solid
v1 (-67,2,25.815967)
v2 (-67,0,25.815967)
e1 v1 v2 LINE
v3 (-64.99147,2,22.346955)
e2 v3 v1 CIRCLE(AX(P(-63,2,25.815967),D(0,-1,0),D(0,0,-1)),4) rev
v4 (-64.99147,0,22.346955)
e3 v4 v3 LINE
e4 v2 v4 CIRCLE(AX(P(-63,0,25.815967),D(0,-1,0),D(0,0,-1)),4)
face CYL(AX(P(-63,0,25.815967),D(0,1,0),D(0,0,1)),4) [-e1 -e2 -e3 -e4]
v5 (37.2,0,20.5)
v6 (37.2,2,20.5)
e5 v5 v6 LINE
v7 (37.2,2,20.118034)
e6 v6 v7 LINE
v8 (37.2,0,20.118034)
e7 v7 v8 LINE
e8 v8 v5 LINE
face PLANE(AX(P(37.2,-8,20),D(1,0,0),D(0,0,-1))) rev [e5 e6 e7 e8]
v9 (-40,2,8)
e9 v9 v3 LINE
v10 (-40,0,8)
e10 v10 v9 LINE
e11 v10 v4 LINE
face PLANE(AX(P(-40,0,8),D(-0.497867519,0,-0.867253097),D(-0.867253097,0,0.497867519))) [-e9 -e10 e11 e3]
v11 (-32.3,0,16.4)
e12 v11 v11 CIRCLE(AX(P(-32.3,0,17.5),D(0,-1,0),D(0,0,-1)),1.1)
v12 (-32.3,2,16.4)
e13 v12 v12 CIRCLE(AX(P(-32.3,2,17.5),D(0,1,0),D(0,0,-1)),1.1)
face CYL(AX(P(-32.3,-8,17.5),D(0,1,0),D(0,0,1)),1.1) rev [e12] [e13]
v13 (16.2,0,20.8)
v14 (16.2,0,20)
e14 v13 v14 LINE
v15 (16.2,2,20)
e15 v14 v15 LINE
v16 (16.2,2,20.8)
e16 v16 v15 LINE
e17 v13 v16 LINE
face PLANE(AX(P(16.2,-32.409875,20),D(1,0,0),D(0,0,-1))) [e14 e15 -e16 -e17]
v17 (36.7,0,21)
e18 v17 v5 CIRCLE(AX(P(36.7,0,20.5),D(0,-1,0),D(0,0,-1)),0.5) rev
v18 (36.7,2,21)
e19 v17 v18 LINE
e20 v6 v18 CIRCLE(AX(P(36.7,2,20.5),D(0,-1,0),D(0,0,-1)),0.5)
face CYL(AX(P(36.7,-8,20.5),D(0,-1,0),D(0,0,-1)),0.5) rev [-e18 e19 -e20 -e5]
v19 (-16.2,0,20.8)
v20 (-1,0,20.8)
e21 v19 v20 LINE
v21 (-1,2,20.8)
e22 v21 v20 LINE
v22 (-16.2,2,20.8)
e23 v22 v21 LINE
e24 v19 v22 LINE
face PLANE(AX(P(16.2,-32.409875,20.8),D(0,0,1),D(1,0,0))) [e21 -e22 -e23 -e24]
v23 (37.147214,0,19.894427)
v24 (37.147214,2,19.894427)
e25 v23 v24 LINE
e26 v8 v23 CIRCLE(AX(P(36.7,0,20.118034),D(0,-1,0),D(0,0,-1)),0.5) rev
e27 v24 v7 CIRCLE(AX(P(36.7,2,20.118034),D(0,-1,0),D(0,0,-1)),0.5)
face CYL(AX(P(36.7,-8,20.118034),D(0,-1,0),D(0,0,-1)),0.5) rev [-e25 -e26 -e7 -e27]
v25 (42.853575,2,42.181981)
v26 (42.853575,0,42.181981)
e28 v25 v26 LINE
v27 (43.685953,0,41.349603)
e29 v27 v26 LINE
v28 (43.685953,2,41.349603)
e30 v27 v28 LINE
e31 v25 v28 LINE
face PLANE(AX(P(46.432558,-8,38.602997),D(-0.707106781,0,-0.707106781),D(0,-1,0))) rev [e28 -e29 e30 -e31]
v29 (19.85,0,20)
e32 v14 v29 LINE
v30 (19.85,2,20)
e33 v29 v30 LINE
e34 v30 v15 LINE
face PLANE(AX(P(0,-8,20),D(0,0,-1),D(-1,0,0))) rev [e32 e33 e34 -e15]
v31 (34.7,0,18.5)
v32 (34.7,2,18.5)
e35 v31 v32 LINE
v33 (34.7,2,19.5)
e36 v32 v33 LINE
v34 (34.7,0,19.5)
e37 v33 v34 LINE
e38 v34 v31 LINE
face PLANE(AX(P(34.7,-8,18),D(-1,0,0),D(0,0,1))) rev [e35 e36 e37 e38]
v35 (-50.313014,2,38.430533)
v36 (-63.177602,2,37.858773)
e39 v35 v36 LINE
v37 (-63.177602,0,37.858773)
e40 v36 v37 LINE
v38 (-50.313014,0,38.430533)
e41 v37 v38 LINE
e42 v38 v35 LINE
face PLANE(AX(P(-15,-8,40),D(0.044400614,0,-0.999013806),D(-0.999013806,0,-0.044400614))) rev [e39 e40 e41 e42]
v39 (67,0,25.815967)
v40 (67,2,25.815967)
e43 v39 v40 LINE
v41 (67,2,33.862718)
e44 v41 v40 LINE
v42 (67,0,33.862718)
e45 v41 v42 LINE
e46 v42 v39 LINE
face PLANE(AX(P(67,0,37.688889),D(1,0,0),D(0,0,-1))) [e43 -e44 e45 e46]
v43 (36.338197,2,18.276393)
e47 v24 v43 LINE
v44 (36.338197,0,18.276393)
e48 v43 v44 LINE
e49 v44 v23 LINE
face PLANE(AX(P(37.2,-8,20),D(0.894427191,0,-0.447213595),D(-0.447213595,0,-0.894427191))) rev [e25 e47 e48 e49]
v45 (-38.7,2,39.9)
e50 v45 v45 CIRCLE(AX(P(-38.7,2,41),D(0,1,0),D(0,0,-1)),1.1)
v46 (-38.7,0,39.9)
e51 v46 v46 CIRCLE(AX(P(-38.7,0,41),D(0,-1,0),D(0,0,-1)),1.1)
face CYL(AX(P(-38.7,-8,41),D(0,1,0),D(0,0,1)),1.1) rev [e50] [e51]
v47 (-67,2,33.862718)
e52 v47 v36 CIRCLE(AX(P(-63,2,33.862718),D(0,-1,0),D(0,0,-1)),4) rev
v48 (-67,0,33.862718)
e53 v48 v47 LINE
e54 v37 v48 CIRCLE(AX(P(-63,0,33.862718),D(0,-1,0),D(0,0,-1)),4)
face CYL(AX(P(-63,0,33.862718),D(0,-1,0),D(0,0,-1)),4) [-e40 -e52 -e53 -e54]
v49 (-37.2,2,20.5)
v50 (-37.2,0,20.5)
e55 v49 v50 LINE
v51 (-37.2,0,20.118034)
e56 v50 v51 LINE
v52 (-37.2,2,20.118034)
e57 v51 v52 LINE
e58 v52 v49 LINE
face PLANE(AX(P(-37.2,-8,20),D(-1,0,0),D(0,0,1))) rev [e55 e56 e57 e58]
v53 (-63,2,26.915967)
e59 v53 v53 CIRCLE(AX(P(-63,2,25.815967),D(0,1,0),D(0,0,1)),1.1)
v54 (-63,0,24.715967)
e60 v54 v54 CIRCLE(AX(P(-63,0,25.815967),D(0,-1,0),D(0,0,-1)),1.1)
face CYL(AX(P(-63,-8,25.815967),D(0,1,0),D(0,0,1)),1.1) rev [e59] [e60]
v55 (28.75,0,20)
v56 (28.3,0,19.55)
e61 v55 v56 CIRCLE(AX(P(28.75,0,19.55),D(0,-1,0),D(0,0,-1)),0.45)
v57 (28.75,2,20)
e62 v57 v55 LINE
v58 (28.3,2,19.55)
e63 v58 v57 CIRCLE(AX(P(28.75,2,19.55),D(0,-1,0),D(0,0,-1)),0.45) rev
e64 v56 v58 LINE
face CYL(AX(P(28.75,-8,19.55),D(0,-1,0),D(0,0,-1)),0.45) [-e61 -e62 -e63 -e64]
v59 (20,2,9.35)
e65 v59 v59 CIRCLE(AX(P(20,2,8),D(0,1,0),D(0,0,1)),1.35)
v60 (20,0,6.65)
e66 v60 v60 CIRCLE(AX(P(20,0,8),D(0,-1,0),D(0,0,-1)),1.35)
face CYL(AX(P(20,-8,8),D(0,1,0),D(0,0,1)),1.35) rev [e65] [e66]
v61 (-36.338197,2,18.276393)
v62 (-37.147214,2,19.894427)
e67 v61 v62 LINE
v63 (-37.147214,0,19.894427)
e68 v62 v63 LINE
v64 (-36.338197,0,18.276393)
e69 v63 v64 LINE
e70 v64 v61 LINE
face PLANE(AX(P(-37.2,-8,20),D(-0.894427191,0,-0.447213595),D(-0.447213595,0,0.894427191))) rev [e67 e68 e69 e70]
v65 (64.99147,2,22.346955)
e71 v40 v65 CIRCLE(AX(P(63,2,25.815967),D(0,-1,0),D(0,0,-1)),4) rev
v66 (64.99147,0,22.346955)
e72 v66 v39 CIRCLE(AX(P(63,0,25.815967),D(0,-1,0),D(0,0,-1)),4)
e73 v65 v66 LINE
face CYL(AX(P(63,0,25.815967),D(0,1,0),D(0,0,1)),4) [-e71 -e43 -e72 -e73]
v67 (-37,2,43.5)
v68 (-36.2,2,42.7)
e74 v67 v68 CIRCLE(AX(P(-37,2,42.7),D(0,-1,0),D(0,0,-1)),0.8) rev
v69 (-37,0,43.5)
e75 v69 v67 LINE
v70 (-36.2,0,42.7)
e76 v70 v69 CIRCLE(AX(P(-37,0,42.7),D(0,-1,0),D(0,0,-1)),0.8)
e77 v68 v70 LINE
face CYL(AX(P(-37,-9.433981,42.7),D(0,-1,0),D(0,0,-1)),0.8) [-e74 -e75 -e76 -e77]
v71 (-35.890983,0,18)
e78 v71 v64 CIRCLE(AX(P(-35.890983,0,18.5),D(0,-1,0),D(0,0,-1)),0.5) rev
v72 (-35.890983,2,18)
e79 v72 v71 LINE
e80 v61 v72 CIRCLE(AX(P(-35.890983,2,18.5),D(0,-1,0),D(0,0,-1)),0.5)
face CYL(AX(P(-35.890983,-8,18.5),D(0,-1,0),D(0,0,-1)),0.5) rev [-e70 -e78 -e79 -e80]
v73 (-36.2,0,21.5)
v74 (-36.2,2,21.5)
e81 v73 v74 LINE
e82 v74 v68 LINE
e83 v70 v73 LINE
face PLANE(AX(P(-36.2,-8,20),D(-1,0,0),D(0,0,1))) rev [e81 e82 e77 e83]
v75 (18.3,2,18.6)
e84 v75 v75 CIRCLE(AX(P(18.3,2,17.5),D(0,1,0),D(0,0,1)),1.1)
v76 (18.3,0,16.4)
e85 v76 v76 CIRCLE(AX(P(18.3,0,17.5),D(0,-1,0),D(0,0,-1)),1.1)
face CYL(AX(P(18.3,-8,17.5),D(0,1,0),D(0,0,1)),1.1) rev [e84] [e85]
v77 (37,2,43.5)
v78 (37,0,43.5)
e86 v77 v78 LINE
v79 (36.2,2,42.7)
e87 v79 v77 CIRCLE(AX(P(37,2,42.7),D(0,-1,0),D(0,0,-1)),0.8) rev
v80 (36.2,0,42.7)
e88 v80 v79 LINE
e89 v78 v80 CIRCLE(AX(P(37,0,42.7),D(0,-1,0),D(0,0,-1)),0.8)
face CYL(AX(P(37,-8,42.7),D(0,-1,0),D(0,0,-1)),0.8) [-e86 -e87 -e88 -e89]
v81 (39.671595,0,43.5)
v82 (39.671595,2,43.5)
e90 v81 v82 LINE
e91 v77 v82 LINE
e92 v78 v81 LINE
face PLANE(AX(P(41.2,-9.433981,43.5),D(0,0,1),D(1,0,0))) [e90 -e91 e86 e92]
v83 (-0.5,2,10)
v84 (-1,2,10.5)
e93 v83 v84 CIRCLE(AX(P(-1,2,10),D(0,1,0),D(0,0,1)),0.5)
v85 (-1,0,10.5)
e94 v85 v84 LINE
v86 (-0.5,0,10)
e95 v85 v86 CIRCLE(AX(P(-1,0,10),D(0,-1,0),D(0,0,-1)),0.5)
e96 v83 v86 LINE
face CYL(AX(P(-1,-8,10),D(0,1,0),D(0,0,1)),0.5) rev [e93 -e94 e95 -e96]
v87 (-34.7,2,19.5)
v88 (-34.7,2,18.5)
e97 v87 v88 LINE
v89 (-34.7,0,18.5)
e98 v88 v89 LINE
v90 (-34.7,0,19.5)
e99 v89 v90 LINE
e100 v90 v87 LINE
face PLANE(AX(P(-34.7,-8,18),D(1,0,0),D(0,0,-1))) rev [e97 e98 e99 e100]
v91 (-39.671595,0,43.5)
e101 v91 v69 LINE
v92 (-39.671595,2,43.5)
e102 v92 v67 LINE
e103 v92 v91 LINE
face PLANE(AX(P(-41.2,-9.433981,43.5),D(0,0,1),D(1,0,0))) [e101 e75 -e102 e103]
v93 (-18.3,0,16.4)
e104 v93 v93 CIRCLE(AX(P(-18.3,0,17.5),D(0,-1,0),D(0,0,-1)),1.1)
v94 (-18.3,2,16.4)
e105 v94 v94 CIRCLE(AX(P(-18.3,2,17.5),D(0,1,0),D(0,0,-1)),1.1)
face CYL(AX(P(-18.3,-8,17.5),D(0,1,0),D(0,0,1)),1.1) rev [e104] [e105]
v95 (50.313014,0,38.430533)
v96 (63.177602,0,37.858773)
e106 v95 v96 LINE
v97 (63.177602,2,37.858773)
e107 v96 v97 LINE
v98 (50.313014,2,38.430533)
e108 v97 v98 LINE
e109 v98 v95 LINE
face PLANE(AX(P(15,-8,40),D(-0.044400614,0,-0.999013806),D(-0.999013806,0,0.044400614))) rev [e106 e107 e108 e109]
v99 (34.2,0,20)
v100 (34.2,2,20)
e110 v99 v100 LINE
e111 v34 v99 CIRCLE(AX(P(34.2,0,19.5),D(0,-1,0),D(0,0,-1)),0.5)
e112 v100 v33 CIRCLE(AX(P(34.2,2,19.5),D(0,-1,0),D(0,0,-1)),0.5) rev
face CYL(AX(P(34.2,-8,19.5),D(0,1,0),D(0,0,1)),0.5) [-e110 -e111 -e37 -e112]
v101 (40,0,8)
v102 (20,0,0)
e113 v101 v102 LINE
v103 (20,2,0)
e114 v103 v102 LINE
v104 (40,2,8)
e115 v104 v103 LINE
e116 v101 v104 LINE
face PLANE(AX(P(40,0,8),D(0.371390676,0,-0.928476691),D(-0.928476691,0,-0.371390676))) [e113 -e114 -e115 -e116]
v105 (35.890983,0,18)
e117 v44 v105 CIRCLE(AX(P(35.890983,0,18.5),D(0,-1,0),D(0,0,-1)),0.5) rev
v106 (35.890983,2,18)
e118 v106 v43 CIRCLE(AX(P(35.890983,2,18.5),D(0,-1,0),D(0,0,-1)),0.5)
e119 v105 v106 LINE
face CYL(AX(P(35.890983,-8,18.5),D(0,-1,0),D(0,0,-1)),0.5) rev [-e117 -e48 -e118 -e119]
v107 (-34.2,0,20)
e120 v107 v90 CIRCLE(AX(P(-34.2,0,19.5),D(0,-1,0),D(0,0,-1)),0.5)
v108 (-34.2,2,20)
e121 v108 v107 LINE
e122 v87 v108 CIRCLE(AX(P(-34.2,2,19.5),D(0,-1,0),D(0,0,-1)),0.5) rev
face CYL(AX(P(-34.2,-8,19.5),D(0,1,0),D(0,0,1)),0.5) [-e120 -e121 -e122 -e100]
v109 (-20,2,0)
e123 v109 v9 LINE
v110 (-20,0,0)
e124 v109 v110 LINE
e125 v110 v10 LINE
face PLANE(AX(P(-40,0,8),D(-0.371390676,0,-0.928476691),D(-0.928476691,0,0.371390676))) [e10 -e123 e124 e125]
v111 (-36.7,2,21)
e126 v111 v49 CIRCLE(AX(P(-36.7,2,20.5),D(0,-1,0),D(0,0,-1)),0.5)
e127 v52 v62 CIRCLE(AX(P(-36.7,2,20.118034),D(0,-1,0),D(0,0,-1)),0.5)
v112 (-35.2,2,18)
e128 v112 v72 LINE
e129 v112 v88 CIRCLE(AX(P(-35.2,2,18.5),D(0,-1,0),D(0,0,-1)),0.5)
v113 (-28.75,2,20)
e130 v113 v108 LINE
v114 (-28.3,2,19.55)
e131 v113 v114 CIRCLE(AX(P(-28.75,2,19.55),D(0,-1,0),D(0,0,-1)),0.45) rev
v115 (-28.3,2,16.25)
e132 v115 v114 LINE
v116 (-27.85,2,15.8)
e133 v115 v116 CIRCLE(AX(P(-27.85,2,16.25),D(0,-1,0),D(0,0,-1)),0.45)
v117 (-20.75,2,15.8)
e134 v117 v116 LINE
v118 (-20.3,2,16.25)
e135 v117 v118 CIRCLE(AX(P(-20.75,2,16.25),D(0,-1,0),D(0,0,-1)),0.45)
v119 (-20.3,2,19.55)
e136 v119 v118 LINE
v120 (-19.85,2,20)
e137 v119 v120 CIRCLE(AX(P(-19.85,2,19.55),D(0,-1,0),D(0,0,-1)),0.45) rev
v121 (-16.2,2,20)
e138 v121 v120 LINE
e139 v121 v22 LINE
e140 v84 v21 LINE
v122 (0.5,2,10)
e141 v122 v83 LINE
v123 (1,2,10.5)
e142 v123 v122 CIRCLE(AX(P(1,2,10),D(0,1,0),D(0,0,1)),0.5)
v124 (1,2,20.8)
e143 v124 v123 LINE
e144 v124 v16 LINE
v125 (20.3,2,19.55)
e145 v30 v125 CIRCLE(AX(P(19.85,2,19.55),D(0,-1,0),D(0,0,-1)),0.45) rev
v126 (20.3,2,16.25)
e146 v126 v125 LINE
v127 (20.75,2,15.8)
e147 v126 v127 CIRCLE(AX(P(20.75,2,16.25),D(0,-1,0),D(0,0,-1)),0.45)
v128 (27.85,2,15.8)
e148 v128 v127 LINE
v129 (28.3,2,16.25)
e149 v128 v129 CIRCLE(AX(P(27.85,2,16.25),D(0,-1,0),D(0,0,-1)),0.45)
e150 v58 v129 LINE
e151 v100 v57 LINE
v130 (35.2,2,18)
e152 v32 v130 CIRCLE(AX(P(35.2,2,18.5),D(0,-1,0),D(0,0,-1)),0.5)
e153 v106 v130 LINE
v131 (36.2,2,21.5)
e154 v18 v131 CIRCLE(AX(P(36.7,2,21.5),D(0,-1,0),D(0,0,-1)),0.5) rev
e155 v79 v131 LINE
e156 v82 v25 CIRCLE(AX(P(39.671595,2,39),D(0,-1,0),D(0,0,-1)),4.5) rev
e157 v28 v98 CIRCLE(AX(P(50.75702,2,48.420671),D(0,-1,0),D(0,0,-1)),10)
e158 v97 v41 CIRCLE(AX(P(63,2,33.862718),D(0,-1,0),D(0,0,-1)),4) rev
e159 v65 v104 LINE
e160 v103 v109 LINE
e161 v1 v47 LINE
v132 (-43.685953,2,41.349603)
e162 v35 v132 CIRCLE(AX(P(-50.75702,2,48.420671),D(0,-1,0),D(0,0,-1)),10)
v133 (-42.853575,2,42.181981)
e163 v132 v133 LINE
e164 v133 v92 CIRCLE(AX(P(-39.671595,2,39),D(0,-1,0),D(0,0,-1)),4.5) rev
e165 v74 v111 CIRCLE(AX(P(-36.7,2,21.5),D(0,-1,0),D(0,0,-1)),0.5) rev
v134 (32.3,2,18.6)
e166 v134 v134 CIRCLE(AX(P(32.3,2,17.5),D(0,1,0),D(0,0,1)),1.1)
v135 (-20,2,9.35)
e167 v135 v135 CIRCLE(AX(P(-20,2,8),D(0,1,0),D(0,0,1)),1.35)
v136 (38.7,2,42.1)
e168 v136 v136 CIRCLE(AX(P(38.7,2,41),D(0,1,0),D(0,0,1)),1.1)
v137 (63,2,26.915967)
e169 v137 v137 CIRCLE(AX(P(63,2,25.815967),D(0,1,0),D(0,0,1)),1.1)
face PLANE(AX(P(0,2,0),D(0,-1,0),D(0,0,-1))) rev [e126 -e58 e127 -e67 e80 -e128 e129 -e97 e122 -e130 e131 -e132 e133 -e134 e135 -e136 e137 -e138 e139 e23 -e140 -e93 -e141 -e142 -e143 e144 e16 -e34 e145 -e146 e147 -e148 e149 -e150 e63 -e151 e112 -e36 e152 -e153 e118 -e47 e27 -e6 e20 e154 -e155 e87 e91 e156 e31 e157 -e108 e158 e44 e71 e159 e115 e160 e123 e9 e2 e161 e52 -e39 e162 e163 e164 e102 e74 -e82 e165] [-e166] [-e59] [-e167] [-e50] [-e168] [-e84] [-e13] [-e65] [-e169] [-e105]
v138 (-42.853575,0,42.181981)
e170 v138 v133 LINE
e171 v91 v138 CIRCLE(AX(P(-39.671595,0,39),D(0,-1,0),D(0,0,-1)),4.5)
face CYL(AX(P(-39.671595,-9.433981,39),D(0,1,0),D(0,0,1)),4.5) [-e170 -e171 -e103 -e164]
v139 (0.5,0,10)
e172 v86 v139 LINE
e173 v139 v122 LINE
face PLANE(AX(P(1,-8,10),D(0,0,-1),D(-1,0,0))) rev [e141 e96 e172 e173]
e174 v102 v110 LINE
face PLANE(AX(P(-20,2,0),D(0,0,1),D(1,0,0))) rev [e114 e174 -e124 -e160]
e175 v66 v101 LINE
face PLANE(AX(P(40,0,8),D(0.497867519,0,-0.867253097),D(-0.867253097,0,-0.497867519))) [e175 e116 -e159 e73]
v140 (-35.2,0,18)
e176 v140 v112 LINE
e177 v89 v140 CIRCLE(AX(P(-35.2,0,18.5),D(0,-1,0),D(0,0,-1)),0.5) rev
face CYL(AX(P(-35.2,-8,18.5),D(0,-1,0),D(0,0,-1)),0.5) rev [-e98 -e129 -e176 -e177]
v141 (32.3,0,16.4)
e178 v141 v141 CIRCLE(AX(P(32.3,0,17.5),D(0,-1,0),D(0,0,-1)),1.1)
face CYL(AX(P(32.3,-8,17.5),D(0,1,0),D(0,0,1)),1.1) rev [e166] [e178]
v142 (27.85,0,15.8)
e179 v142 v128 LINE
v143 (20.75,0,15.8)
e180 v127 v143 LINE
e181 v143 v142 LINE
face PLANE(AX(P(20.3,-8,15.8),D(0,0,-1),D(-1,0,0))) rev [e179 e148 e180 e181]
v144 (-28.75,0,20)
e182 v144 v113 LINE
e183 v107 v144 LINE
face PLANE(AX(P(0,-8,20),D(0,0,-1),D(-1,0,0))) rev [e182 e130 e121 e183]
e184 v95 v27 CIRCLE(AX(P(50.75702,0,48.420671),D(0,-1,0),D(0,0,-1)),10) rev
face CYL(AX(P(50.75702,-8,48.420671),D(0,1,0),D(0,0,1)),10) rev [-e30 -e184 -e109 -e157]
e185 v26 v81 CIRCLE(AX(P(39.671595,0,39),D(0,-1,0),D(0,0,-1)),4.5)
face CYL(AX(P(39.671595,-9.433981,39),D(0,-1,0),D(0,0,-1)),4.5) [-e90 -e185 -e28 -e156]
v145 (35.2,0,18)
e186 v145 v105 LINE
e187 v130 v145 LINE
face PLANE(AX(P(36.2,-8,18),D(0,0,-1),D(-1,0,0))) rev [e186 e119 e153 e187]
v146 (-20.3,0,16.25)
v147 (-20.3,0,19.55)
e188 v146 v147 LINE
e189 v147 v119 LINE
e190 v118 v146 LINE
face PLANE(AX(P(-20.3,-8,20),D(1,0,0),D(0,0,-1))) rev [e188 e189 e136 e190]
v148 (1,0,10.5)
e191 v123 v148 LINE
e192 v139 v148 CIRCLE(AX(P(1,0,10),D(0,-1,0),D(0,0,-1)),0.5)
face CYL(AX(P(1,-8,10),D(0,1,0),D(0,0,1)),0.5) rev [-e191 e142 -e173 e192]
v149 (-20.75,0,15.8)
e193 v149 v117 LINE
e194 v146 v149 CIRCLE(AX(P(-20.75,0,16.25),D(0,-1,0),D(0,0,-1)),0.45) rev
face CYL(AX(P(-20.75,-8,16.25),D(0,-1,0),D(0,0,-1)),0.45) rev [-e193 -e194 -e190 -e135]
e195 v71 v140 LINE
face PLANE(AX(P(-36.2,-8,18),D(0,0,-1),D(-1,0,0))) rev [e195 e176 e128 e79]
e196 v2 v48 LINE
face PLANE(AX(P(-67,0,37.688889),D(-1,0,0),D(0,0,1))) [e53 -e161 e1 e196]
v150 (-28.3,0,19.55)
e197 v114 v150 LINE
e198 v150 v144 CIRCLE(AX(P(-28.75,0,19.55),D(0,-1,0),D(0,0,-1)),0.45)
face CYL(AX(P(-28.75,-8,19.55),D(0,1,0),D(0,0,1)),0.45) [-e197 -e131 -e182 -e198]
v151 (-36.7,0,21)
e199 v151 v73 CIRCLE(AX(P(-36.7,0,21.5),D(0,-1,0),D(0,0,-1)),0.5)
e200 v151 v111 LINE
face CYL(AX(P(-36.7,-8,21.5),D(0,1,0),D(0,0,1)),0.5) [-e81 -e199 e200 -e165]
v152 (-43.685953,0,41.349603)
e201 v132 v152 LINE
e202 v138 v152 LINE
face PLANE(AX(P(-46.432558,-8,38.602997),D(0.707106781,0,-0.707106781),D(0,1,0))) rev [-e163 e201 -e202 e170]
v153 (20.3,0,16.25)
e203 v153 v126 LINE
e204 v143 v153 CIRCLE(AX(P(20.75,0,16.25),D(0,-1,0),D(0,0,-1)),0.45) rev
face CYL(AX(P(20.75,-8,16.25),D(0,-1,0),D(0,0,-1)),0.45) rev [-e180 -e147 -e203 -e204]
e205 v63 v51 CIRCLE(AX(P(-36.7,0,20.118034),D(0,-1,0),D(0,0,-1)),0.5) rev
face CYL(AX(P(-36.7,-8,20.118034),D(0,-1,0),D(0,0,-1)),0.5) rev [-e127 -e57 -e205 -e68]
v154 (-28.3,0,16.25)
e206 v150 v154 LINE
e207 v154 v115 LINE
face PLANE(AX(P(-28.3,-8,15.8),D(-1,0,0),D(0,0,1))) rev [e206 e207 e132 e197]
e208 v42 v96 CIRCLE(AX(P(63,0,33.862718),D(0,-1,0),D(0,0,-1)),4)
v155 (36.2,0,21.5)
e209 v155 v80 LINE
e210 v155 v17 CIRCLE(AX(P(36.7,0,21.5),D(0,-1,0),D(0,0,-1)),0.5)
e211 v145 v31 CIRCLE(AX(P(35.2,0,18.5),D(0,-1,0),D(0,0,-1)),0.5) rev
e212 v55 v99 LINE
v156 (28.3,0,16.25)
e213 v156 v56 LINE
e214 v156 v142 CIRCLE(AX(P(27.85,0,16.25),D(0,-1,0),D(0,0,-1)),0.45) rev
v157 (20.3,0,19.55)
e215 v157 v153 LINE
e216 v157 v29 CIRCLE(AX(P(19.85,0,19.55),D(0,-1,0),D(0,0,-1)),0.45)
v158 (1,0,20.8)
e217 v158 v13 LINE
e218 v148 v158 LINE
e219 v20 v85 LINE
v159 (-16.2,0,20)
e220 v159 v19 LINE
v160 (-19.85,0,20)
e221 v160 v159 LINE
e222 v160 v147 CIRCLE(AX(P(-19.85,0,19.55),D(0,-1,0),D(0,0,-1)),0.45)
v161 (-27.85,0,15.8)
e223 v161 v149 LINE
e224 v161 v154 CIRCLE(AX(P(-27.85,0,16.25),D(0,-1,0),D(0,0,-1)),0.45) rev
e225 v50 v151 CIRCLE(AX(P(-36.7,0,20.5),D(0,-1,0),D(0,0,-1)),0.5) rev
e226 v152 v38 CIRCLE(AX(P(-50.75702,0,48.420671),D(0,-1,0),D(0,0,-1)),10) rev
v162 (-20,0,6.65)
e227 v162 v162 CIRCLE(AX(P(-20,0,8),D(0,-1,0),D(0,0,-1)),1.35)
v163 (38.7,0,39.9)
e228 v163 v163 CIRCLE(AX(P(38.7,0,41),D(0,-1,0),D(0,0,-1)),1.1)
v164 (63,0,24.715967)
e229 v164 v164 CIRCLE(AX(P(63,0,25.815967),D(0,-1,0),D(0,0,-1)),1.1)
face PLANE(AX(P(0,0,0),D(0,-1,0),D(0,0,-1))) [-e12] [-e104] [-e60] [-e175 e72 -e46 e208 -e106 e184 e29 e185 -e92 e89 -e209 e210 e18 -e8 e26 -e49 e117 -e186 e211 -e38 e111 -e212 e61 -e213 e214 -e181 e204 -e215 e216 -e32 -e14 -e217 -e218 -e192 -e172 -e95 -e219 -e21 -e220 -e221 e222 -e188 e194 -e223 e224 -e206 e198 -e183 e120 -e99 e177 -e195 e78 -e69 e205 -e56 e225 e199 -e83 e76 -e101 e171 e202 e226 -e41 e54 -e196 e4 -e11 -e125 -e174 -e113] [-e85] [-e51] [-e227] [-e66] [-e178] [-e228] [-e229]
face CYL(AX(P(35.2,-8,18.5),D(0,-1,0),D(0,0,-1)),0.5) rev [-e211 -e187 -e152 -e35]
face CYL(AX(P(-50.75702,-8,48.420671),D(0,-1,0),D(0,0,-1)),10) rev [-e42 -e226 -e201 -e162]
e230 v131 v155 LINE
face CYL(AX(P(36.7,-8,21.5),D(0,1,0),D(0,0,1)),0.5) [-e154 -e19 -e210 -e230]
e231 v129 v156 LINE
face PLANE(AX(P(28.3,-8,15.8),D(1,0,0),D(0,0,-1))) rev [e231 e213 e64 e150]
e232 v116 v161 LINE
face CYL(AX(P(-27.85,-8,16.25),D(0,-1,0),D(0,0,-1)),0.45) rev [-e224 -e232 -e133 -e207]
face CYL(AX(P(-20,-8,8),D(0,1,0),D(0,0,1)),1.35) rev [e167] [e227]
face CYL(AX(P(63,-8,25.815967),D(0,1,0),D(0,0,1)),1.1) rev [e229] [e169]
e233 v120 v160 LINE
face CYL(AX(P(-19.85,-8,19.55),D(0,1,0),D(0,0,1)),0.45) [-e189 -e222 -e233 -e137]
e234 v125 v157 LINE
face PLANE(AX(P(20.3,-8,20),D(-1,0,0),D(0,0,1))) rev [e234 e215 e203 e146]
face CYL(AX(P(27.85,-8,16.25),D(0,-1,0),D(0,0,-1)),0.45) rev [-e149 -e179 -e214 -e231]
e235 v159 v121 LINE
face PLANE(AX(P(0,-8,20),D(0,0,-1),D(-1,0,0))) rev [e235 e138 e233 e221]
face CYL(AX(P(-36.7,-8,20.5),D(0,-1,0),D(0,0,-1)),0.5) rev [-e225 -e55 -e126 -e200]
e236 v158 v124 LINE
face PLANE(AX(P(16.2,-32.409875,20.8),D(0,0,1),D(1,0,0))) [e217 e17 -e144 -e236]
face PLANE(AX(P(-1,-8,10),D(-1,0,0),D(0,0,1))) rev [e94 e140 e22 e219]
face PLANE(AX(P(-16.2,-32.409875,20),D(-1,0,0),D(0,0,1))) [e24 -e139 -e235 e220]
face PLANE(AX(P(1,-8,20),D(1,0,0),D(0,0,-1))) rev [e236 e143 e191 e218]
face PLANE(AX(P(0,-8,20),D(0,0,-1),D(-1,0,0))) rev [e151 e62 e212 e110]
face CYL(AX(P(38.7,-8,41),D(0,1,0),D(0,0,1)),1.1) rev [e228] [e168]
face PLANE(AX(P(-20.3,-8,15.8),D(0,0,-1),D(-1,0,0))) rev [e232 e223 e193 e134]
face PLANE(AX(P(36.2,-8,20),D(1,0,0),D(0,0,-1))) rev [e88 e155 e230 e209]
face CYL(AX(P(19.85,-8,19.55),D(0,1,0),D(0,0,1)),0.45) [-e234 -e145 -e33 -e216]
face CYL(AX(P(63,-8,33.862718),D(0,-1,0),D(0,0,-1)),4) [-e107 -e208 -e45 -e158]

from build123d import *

# Parameters (mm, degrees)
EXTRUDE_1_DEPTH      = 2
CUT_EXTRUDE_1_DEPTH  = 10
SKETCH_3_W           = 2
SKETCH_3_H           = 10
CUT_EXTRUDE_2_DEPTH  = 10
CUT_EXTRUDE_3_DEPTH  = 10
SKETCH_5_W           = 23
SKETCH_5_H           = 22.484633815
CUT_EXTRUDE_4_DEPTH  = 10
SKETCH_6_W           = 32.4
SKETCH_6_H           = 0.8
EXTRUDE_2_DEPTH      = 2
SKETCH_7_R           = 1.1
CUT_EXTRUDE_5_DEPTH  = 10
EXTRUDE_3_DEPTH      = 2
SKETCH_9_R           = 1.1
CUT_EXTRUDE_6_DEPTH  = 10
CHAMFER_2_SIZE       = 5
CHAMFER_2_SIZE_2     = 5.237723549
FILLET_2_R           = 10
FILLET_3_R           = 4.5
SKETCH_10_W          = 1.5
SKETCH_10_H          = 2
CUT_EXTRUDE_7_DEPTH  = 10
SKETCH_11_R          = 1.35
CUT_EXTRUDE_8_DEPTH  = 10
SKETCH_12_W          = 8
SKETCH_12_H          = 4.2
CUT_EXTRUDE_9_DEPTH  = 10
FILLET_5_R           = 0.45
CUT_EXTRUDE_10_DEPTH = 10
FILLET_6_R           = 0.5
FILLET_7_R           = 0.8
SKETCH_14_R          = 0.5
CUT_EXTRUDE_11_DEPTH = 10
SKETCH_15_W          = 2
SKETCH_15_H          = 0.8
CUT_EXTRUDE_12_DEPTH = 10
EXTRUDE_4_DEPTH      = 2
FILLET_8_R           = 4
SKETCH_17_R          = 1.1
CUT_EXTRUDE_13_DEPTH = 10


# Some blends are built 0.0001 mm under size
with BuildPart() as part:
    # 草图1 → 凸台-拉伸1 (new body)
    with BuildSketch(Plane(origin=(0, 0, 0), x_dir=(1, 0, 0), z_dir=(0, 1, 0))):
        Polygon((-20, 0), (20, 0), (60, -20), (60, -40), (0, -40), (-60, -40), (-60, -20), align=None)
    extrude(amount=EXTRUDE_1_DEPTH)

    # 草图2 → 切除-拉伸1 (cut)
    with BuildSketch(Plane(origin=(0, 2, 0), x_dir=(1, 0, 0), z_dir=(0, 1, 0))):
        Polygon((0, -20), (13.2, -20), (13.2, -40), (-13.2, -40), (-13.2, -20), align=None)
    extrude(amount=-CUT_EXTRUDE_1_DEPTH, mode=Mode.SUBTRACT)

    # 草图3 → 切除-拉伸2 (cut)
    with BuildSketch(Plane(origin=(0, 2, 0), x_dir=(1, 0, 0), z_dir=(0, 1, 0))):
        with Locations((0, -15)):
            Rectangle(SKETCH_3_W, SKETCH_3_H)
    extrude(amount=-CUT_EXTRUDE_2_DEPTH, mode=Mode.SUBTRACT)

    # 草图4 → 切除-拉伸3 (cut)
    with BuildSketch(Plane(origin=(0, 2, 0), x_dir=(1, 0, 0), z_dir=(0, 1, 0))):
        Polygon((-60, -40), (-60, -38), (-15, -40), align=None)
        Polygon((60, -40), (15, -40), (60, -38), align=None)
    extrude(amount=-CUT_EXTRUDE_3_DEPTH, mode=Mode.SUBTRACT)

    # 草图5 → 切除-拉伸4 (cut)
    with BuildSketch(Plane(origin=(0, 2, 0), x_dir=(1, 0, 0), z_dir=(0, 1, 0))):
        with Locations((24.7, -31.242316908)):
            Rectangle(SKETCH_5_W, SKETCH_5_H)
        with Locations((-24.7, -31.242316908)):
            Rectangle(SKETCH_5_W, SKETCH_5_H)
    extrude(amount=-CUT_EXTRUDE_4_DEPTH, mode=Mode.SUBTRACT)

    # 草图6 → 凸台-拉伸2 (add)
    with BuildSketch(Plane(origin=(0, 2, 0), x_dir=(1, 0, 0), z_dir=(0, 1, 0))):
        with Locations((0, -20.4)):
            Rectangle(SKETCH_6_W, SKETCH_6_H)
    extrude(amount=-EXTRUDE_2_DEPTH)

    # 草图7 → 切除-拉伸5 (cut)
    with BuildSketch(Plane(origin=(0, 2, 0), x_dir=(1, 0, 0), z_dir=(0, 1, 0))):
        with Locations(Location((32.3, -17.5, 0), (0, 0, 270))):
            Circle(SKETCH_7_R)
        with Locations(Location((18.3, -17.5, 0), (0, 0, 270))):
            Circle(SKETCH_7_R)
        with Locations(Location((-18.3, -17.5, 0), (0, 0, 90))):
            Circle(SKETCH_7_R)
        with Locations(Location((-32.3, -17.5, 0), (0, 0, 90))):
            Circle(SKETCH_7_R)
    extrude(amount=-CUT_EXTRUDE_5_DEPTH, mode=Mode.SUBTRACT)

    # 草图8 → 凸台-拉伸3 (add)
    with BuildSketch(Plane(origin=(0, 2, 0), x_dir=(1, 0, 0), z_dir=(0, 1, 0))):
        Polygon((-36.2, -43.5), (-36.2, -40), (-36.2, -35.5), (-41.2, -35.5), (-41.2, -43.5), align=None)
        Polygon((36.2, -40), (36.2, -35.5), (41.2, -35.5), (41.2, -43.5), (36.2, -43.5), align=None)
    extrude(amount=-EXTRUDE_3_DEPTH)

    # 草图9 → 切除-拉伸6 (cut)
    with BuildSketch(Plane(origin=(0, 2, 0), x_dir=(1, 0, 0), z_dir=(0, 1, 0))):
        with Locations(Location((38.7, -41, 0), (0, 0, 270))):
            Circle(SKETCH_9_R)
        with Locations(Location((-38.7, -41, 0), (0, 0, 90))):
            Circle(SKETCH_9_R)
    extrude(amount=-CUT_EXTRUDE_6_DEPTH, mode=Mode.SUBTRACT)

    # 倒角2
    # the kernel refuses this chamfer: 5.237723549, 5 mm, written as the material it adds along each edge
    with BuildSketch(Plane(origin=(-41.2, 2, 38.835555556), x_dir=(0.02876451379188079, 0, 0.9995862157644616), z_dir=(0, -1, 0))) as chamfer_2_piece_1_section:
        Polygon((CHAMFER_2_SIZE * 0.999586215764, CHAMFER_2_SIZE * 0.0287645137919), (-CHAMFER_2_SIZE_2 * 0.073118387756, CHAMFER_2_SIZE_2 * 0.997323268169), (0, 0), align=None)
    chamfer_2_piece_1 = extrude(amount=2, mode=Mode.PRIVATE)
    chamfer_2_piece_1 = split(chamfer_2_piece_1, bisect_by=Plane(origin=(-42.946846358, 1, 43.5), z_dir=(0, 0, -1)), keep=Keep.TOP, mode=Mode.PRIVATE)
    add(chamfer_2_piece_1)
    with BuildSketch(Plane(origin=(41.2, 2, 38.835555556), x_dir=(-0.028764513791882163, 0, 0.9995862157644615), z_dir=(0, -1, 0))) as chamfer_2_piece_2_section:
        Polygon((CHAMFER_2_SIZE * 0.999586215764, -CHAMFER_2_SIZE * 0.0287645137919), (-CHAMFER_2_SIZE_2 * 0.073118387756, -CHAMFER_2_SIZE_2 * 0.997323268169), (0, 0), align=None)
    chamfer_2_piece_2 = extrude(amount=2, mode=Mode.PRIVATE)
    chamfer_2_piece_2 = split(chamfer_2_piece_2, bisect_by=Plane(origin=(42.946846358, 1, 43.5), z_dir=(0, 0, -1)), keep=Keep.TOP, mode=Mode.PRIVATE)
    add(chamfer_2_piece_2)

    # 圆角2
    fillet_2_edges = [part.edges().sort_by_distance(p)[0] for p in [
        (-46.43255814, 1, 38.602997416),
        (46.43255814, 1, 38.602997416),
    ]]
    fillet(fillet_2_edges, radius=FILLET_2_R)

    # 圆角3
    fillet_3_edges = [part.edges().sort_by_distance(p)[0] for p in [
        (-41.535555556, 1, 43.5),
        (41.535555556, 1, 43.5),
    ]]
    fillet(fillet_3_edges, radius=FILLET_3_R)

    # 草图10 → 切除-拉伸7 (cut)
    with BuildSketch(Plane(origin=(0, 2, 0), x_dir=(1, 0, 0), z_dir=(0, 1, 0))):
        with Locations((35.45, -19)):
            Rectangle(SKETCH_10_W, SKETCH_10_H)
        with Locations((-35.45, -19)):
            Rectangle(SKETCH_10_W, SKETCH_10_H)
    extrude(amount=-CUT_EXTRUDE_7_DEPTH, mode=Mode.SUBTRACT)

    # 草图11 → 切除-拉伸8 (cut)
    with BuildSketch(Plane(origin=(0, 2, 0), x_dir=(1, 0, 0), z_dir=(0, 1, 0))):
        with Locations(Location((20, -8, 0), (0, 0, 270))):
            Circle(SKETCH_11_R)
        with Locations(Location((-20, -8, 0), (0, 0, 270))):
            Circle(SKETCH_11_R)
    extrude(amount=-CUT_EXTRUDE_8_DEPTH, mode=Mode.SUBTRACT)

    # 草图12 → 切除-拉伸9 (cut)
    with BuildSketch(Plane(origin=(0, 2, 0), x_dir=(1, 0, 0), z_dir=(0, 1, 0))):
        with Locations((-24.3, -17.9)):
            Rectangle(SKETCH_12_W, SKETCH_12_H)
        with Locations((24.3, -17.9)):
            Rectangle(SKETCH_12_W, SKETCH_12_H)
    extrude(amount=-CUT_EXTRUDE_9_DEPTH, mode=Mode.SUBTRACT)

    # 圆角5
    fillet_5_edges = [part.edges().sort_by_distance(p)[0] for p in [
        (20.3, 1, 20),
        (28.3, 1, 20),
        (-20.3, 1, 20),
        (-28.3, 1, 20),
        (-28.3, 1, 15.8),
        (-20.3, 1, 15.8),
        (28.3, 1, 15.8),
        (20.3, 1, 15.8),
    ]]
    fillet(fillet_5_edges, radius=FILLET_5_R)

    # 草图13 → 切除-拉伸10 (cut)
    with BuildSketch(Plane(origin=(0, 2, 0), x_dir=(1, 0, 0), z_dir=(0, 1, 0))):
        Polygon((-36.2, -18), (-36.2, -20), (-36.2, -21), (-37.2, -21), (-37.2, -20), align=None)
        Polygon((36.2, -21), (36.2, -20), (36.2, -18), (37.2, -20), (37.2, -21), align=None)
    extrude(amount=-CUT_EXTRUDE_10_DEPTH, mode=Mode.SUBTRACT)

    # 圆角6
    fillet_6_edges = [part.edges().sort_by_distance(p)[0] for p in [
        (34.7, 1, 20),
        (34.7, 1, 18),
        (36.2, 1, 18),
        (-34.7, 1, 18),
        (-34.7, 1, 20),
        (-36.2, 1, 18),
        (-37.2, 1, 20),
        (-36.2, 1, 21),
        (-37.2, 1, 21),
        (37.2, 1, 21),
        (36.2, 1, 21),
        (37.2, 1, 20),
    ]]
    fillet(fillet_6_edges, radius=FILLET_6_R - 0.0001)  # a hair under: the kernel refuses the full size

    # 圆角7
    fillet_7_edges = [part.edges().sort_by_distance(p)[0] for p in [
        (36.2, 1, 43.5),
        (-36.2, 1, 43.5),
    ]]
    fillet(fillet_7_edges, radius=FILLET_7_R)

    # 草图14 → 切除-拉伸11 (cut)
    with BuildSketch(Plane(origin=(0, 2, 0), x_dir=(1, 0, 0), z_dir=(0, 1, 0))):
        with Locations((-1, -10)):
            Circle(SKETCH_14_R)
        with Locations((1, -10)):
            Circle(SKETCH_14_R)
    extrude(amount=-CUT_EXTRUDE_11_DEPTH, mode=Mode.SUBTRACT)

    # 草图15 → 切除-拉伸12 (cut)
    with BuildSketch(Plane(origin=(0, 2, 0), x_dir=(1, 0, 0), z_dir=(0, 1, 0))):
        with Locations((0, -20.4)):
            Rectangle(SKETCH_15_W, SKETCH_15_H)
    extrude(amount=-CUT_EXTRUDE_12_DEPTH, mode=Mode.SUBTRACT)

    # 草图16 → 凸台-拉伸4 (add)
    with BuildSketch(Plane(origin=(0, 2, 0), x_dir=(1, 0, 0), z_dir=(0, 1, 0))):
        Polygon((-60, -20), (-60, -38), (-67, -37.688888889), (-67, -23.5), (-40, -8), (-20, 0), align=None)
        Polygon((40, -8), (67, -23.5), (67, -37.688888889), (60, -38), (60, -20), (20, 0), align=None)
    extrude(amount=-EXTRUDE_4_DEPTH)

    # 圆角8
    fillet_8_edges = [part.edges().sort_by_distance(p)[0] for p in [
        (-67, 1, 37.688888889),
        (-67, 1, 23.5),
        (67, 1, 23.5),
        (67, 1, 37.688888889),
    ]]
    fillet(fillet_8_edges, radius=FILLET_8_R)

    # 草图17 → 切除-拉伸13 (cut)
    with BuildSketch(Plane(origin=(0, 2, 0), x_dir=(1, 0, 0), z_dir=(0, 1, 0))):
        with Locations(Location((-63, -25.81596743, 0), (0, 0, 270))):
            Circle(SKETCH_17_R)
        with Locations(Location((63, -25.81596743, 0), (0, 0, 270))):
            Circle(SKETCH_17_R)
    extrude(amount=-CUT_EXTRUDE_13_DEPTH, mode=Mode.SUBTRACT)


solid = part.part
